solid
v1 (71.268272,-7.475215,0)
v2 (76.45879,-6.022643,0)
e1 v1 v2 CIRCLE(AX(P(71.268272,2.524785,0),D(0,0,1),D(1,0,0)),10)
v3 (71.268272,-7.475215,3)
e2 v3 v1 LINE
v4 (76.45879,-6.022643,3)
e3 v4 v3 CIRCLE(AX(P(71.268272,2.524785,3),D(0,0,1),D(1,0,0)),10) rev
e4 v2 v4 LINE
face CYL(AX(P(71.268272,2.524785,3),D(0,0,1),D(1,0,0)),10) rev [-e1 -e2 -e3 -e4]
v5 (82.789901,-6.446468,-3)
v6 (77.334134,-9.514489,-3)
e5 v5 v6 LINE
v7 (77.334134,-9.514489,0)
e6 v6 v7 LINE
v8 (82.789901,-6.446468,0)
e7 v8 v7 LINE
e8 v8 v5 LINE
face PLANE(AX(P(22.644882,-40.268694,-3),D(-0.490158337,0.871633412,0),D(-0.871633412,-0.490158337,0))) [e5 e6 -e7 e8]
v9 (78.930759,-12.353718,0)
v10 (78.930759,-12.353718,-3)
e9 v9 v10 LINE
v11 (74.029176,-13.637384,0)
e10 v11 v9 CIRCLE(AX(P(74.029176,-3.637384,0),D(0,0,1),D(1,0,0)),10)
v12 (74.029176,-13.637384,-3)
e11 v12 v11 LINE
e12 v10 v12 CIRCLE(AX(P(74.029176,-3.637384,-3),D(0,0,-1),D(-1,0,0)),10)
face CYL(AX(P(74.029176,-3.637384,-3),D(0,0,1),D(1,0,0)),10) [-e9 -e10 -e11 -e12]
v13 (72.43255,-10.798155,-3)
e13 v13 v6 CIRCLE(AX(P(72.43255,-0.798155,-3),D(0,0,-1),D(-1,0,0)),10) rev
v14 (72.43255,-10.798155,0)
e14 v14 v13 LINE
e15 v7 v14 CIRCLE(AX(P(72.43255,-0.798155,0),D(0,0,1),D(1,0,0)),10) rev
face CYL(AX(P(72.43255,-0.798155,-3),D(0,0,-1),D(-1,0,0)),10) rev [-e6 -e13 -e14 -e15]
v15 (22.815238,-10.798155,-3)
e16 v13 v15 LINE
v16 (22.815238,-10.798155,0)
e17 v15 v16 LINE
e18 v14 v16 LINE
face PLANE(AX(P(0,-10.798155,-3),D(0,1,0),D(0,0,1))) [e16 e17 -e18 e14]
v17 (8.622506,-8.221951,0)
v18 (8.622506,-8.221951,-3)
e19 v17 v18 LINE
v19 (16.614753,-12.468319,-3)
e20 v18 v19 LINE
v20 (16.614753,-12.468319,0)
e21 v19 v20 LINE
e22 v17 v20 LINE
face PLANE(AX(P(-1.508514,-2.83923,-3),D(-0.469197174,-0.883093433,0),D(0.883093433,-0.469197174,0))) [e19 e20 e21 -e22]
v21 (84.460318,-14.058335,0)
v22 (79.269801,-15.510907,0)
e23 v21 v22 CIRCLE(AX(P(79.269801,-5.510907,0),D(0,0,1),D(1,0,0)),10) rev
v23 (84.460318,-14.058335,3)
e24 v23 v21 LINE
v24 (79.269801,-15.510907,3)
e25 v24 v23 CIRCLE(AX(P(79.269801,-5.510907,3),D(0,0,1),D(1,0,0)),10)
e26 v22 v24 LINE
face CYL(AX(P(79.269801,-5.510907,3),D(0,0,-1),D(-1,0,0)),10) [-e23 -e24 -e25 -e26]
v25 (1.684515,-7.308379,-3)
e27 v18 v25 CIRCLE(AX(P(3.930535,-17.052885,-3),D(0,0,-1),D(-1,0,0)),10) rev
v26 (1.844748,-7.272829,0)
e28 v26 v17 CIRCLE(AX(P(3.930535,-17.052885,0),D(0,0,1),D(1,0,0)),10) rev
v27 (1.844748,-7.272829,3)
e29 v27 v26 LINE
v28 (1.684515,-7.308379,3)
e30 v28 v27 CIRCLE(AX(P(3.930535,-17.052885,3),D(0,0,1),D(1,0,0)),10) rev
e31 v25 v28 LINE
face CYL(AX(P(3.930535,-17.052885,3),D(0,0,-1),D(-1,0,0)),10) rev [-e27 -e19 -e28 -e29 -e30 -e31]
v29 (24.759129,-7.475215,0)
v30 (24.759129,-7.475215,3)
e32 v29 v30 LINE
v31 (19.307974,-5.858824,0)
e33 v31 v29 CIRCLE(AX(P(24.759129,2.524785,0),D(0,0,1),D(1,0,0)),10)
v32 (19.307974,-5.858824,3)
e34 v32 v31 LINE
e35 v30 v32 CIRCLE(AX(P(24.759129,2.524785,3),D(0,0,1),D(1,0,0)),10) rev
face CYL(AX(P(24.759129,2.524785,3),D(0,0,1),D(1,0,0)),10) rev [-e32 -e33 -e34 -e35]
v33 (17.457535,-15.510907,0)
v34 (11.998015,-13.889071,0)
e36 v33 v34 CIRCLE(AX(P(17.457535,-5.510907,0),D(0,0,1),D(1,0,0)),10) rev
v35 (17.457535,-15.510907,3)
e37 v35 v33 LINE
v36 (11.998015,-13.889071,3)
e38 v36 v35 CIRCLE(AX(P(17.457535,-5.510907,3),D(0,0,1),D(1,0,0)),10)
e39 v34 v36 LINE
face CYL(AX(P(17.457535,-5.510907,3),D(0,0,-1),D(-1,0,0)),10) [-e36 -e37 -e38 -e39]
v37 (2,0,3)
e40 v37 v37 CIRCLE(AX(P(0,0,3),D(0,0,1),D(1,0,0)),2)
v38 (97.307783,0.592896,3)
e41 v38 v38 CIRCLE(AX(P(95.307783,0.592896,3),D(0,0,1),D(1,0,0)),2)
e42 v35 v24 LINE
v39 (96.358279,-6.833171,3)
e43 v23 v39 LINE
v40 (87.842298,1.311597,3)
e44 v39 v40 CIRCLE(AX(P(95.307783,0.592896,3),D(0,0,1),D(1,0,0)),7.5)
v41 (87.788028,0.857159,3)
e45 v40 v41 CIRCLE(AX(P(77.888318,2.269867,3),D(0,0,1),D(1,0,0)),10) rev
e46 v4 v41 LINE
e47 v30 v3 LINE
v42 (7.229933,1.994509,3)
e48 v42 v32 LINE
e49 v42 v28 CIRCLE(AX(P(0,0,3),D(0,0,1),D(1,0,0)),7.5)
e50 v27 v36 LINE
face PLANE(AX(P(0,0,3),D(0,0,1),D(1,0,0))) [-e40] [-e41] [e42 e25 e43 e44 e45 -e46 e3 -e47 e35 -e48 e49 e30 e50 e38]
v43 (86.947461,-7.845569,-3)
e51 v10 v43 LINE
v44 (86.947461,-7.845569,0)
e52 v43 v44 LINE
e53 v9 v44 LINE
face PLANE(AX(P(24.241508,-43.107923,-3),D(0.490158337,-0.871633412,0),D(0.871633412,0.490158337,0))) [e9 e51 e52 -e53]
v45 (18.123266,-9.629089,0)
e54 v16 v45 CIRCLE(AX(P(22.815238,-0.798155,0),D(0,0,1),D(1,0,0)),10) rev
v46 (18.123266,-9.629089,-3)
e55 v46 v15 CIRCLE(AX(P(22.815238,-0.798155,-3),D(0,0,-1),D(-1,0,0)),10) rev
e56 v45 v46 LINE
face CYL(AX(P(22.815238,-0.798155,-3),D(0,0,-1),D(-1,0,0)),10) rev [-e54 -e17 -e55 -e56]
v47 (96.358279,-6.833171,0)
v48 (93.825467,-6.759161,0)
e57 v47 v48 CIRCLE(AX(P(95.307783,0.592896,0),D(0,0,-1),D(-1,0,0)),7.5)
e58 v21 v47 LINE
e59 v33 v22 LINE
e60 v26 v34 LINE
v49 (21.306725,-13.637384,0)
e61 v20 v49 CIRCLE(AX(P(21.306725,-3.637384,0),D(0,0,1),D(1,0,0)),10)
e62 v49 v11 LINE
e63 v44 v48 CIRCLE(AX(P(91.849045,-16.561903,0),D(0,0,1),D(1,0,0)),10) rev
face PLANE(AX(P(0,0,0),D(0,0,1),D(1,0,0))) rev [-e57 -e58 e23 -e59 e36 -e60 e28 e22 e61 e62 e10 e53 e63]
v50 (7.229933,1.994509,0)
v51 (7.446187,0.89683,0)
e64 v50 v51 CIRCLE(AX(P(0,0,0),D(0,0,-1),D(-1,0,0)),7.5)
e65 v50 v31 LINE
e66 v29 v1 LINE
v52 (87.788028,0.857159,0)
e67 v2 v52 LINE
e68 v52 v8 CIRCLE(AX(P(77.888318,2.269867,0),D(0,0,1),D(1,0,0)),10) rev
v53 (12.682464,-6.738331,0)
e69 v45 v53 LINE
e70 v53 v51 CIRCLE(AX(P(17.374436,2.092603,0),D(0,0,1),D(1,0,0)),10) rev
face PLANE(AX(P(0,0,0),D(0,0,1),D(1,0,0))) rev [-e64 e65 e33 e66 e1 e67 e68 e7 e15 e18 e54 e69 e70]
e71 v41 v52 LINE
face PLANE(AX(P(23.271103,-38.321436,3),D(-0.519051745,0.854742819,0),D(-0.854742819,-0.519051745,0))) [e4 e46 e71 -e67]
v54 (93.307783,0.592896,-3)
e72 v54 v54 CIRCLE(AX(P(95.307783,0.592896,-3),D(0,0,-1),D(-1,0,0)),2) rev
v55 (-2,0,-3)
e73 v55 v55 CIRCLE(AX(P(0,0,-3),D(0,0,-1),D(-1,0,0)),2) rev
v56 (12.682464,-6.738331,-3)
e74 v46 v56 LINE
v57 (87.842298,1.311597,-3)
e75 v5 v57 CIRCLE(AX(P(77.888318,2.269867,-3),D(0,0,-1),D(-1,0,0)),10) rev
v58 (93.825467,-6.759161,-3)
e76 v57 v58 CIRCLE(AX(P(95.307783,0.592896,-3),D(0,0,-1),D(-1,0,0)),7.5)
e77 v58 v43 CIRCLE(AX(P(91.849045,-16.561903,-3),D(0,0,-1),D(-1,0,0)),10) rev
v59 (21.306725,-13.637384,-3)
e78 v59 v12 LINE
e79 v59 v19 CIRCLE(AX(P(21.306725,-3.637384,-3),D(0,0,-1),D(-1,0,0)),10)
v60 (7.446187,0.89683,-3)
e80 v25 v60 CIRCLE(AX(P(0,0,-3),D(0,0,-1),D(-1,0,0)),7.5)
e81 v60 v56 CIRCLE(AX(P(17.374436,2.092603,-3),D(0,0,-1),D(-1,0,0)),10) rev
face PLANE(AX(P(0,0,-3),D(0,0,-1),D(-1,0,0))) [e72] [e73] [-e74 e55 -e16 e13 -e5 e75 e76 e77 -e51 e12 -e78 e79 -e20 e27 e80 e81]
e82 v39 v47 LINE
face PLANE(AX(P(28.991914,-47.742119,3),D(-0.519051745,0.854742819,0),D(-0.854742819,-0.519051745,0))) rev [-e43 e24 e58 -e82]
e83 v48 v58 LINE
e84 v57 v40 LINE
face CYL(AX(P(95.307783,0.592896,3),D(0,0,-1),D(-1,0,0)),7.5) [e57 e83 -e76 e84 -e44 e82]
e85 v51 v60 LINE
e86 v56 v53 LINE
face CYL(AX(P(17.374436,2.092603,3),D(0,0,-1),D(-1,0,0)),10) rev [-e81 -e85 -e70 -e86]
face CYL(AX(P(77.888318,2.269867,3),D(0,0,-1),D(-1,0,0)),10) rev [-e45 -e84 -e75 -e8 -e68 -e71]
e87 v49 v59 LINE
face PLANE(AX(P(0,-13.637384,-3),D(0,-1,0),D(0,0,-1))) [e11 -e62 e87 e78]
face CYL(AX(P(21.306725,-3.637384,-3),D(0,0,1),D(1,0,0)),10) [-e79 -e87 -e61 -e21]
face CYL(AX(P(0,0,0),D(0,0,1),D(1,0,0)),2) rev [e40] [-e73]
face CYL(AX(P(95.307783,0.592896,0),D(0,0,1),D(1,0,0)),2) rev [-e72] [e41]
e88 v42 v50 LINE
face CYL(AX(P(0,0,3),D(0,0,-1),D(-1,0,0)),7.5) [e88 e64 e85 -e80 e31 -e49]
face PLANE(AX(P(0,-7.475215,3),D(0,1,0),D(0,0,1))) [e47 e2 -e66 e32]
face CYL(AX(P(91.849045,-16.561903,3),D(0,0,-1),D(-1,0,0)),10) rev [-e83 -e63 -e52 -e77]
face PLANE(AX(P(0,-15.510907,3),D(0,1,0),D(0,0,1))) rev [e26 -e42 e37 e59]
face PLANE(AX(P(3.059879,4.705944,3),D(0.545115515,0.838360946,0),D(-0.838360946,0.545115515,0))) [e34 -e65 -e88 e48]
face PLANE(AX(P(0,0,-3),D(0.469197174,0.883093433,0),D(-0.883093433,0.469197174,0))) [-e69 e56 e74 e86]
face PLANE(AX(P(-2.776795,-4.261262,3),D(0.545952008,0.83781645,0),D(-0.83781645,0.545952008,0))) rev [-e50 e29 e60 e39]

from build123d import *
from build123d.topology import SkipClean

# Parameters (mm, degrees)
EXTRUDE_1_DEPTH     = 3
SKETCH_2_R          = 2
SKETCH_2_R_2        = 1.9999999999999967
CUT_EXTRUDE_1_DEPTH = 105.01455903133225
EXTRUDE_START       = 3
SKETCH_3_R          = 1.9999999999999962
SKETCH_3_R_2        = 2
EXTRUDE_9_DEPTH     = 3
FILLET_1_R          = 10
FILLET_2_R          = 10


with BuildPart() as part:
    # 草图1 → 凸台-拉伸1 (new body)
    with BuildSketch(Plane.XY):
        with BuildLine():
            Line((21.79390335077292, -7.475214596472519), (7.229933319640558, 1.9945085092702048))
            ThreePointArc((7.229933319640558, 1.9945085092702048), (-6.483154274799016, 3.7707705643747733), (1.8411668544431816, -7.270495486148093))
            Line((1.8411668544431845, -7.270495486148092), (14.486878939127898, -15.510906506800303))
            Line((14.486878939127898, -15.510906506800302), (82.06831155956868, -15.510906506800302))
            Line((82.06831155956867, -15.510906506800302), (96.3582789784704, -6.83317051644414))
            ThreePointArc((96.35827897847041, -6.833170516444138), (100.33032000817497, 6.162825901013469), (87.812990018917, 0.8723171575890092))
            Line((87.81299001891699, 0.8723171575890003), (74.06678283695699, -7.475214596472519))
            Line((74.06678283695699, -7.475214596472519), (21.79390335077292, -7.475214596472519))
        make_face()
    extrude(amount=EXTRUDE_1_DEPTH)

    # 草图2 → 切除-拉伸1 (cut, through all)
    with BuildSketch(Plane.XY.offset(3)):
        Circle(SKETCH_2_R)
        with Locations((95.30778311888552, 0.5928956325337316)):
            Circle(SKETCH_2_R_2)
    extrude(amount=-CUT_EXTRUDE_1_DEPTH, mode=Mode.SUBTRACT)

    # 草图3 → 凸台-拉伸9 (add)
    # profile 1 of 3: a face of its own
    with SkipClean():  # the faces are left unmerged after this step: merging them gives an invalid solid
        with BuildSketch(Plane(origin=(0, 0, 0), x_dir=(-1, 0, 0), z_dir=(0, 0, -1)).offset(EXTRUDE_START)):
            with BuildLine():
                ThreePointArc((-91.01590945402396, -5.557699496790565), (-89.75367146553334, -4.447128548171897), (-88.77053253167215, -3.0832918980444344))
                ThreePointArc((-88.77053253167215, -3.0832918980444344), (-88.05246164412989, -1.3071860230668506), (-87.80778311888552, 0.5928956325337297))
                ThreePointArc((-87.80778311888552, 0.5928956325337316), (-87.80908495687888, 0.7326306500420054), (-87.812990018917, 0.8723171575890011))
                ThreePointArc((-87.81299001891699, 0.8723171575890014), (-100.33032000817497, 6.162825901013491), (-96.35827897847041, -6.833170516444131))
                ThreePointArc((-96.35827897847042, -6.833170516444138), (-93.56613473312304, -6.702079412000068), (-91.01590945402396, -5.557699496790565))
            make_face()
            with Locations(Location((-95.30778311888552, 0.5928956325337316, 0), (0, 0, 180))):
                Circle(SKETCH_3_R, mode=Mode.SUBTRACT)
        # profile 2 of 3: a face of its own
        with BuildSketch(Plane(origin=(0, 0, 0), x_dir=(-1, 0, 0), z_dir=(0, 0, -1)).offset(EXTRUDE_START)):
            with BuildLine():
                Line((-75.05143042110615, -10.798154811245045), (-88.77053253167215, -3.0832918980444335))
                ThreePointArc((-88.77053253167215, -3.0832918980444344), (-89.75367146553334, -4.447128548171897), (-91.01590945402396, -5.557699496790565))
                Line((-91.01590945402396, -5.557699496790569), (-76.64805579661679, -13.637384335527532))
                Line((-76.64805579661679, -13.637384335527532), (-18.81509472588799, -13.637384335527532))
                Line((-18.81509472588799, -13.637384335527532), (-4.475261433860523, -6.018474482674216))
                ThreePointArc((-4.475261433860524, -6.018474482674214), (-5.688218997555007, -4.8881657741789315), (-6.623200748856248, -3.5189788064650287))
                Line((-6.623200748856245, -3.5189788064650287), (-20.323608343622624, -10.798154811245045))
                Line((-20.323608343622624, -10.798154811245045), (-75.05143042110615, -10.798154811245045))
            make_face()
        # profile 3 of 3: a face of its own
        with BuildSketch(Plane(origin=(0, 0, 0), x_dir=(-1, 0, 0), z_dir=(0, 0, -1)).offset(EXTRUDE_START)):
            with BuildLine():
                ThreePointArc((-7.229933319640558, 1.9945085092702044), (-7.454996074789714, -0.8203862047048063), (-6.623200748856248, -3.5189788064650287))
                ThreePointArc((-6.623200748856248, -3.5189788064650287), (-5.688218997555007, -4.8881657741789315), (-4.475261433860524, -6.018474482674214))
                ThreePointArc((-4.475261433860524, -6.018474482674214), (-3.2196592565993294, -6.773757765922417), (-1.8411668544431843, -7.270495486148093))
                ThreePointArc((-1.8411668544431843, -7.270495486148093), (4.606584884254069, -5.918561962517747), (7.5, -1.84e-15))
                ThreePointArc((7.5, 0), (1.00635483371816, 7.432176662906506), (-7.229933319640558, 1.9945085092702044))
            make_face()
            with Locations(Location((0, 0, 0), (0, 0, 180))):
                Circle(SKETCH_3_R_2, mode=Mode.SUBTRACT)
        extrude(amount=-EXTRUDE_9_DEPTH)

    # 圆角1
    # the kernel refuses this fillet: 10 mm, written as the material it adds along each edge
    with BuildSketch(Plane(origin=(88.77053253167215, -3.083291898044434, -3), x_dir=(-0.20664882712832097, 0.9784151788716738, 0), z_dir=(0, 0, 1))) as fillet_1_piece_1_section:
        with BuildLine():
            CenterArc((7.4864083793494025, 9.541100058820126), FILLET_1_R, 197.4249522895106, 55.15009542096897)
            Line((-2.0546916794712278, 6.546536707082027), (0, 0))
            ThreePointArc((0, 0), (2.245922513804829, 0.34417495588492364), (4.491845027609668, -5e-17))
        make_face()
    fillet_1_piece_1 = extrude(amount=20.153516540869376, mode=Mode.PRIVATE)
    fillet_1_piece_1 = split(fillet_1_piece_1, bisect_by=Plane(origin=(86.96414266235654, -3.033123271198268, 3), z_dir=(0, 0, -1)), keep=Keep.TOP, mode=Mode.PRIVATE)
    add(fillet_1_piece_1)
    with BuildSketch(Plane(origin=(91.01590945402396, -5.557699496790567, -3), x_dir=(0.9194568899378542, -0.39319082841008474, 0), z_dir=(0, 0, 1))) as fillet_1_piece_2:
        with BuildLine():
            CenterArc((5.092784059285759, -9.790309907458374), FILLET_1_R, 101.75407382431756, 40.75010367707175)
            Line((-2.8411931775201964, -3.7032740766253633), (0, 0))
            ThreePointArc((0, 0), (1.5278352177857282, -0.1572675694062238), (3.055670435571466, 9e-17))
        make_face()
    extrude(amount=3)
    with BuildSketch(Plane(origin=(4.475261433860524, -6.018474482674215, -3), x_dir=(-0.9077280584793651, -0.4195590206982592, 0), z_dir=(0, 0, 1))) as fillet_1_piece_3_section:
        with BuildLine():
            CenterArc((5.124050374991801, 9.787699282299565), FILLET_1_R, 217.21105425538934, 40.96167029208499)
            Line((-2.840082184875719, 3.740171475926284), (0, 0))
            ThreePointArc((0, 0), (1.53721511249754, 0.15922553827532712), (3.0744302249950772, 4e-17))
        make_face()
    fillet_1_piece_3 = extrude(amount=14.740674354083392, mode=Mode.PRIVATE)
    fillet_1_piece_3 = split(fillet_1_piece_3, bisect_by=Plane(origin=(4.991537565692553, -6.857429506035165, 3), z_dir=(0, 0, -1)), keep=Keep.TOP, mode=Mode.PRIVATE)
    add(fillet_1_piece_3)
    with BuildSketch(Plane(origin=(6.623200748856247, -3.5189788064650287, -3), x_dir=(0.883093433180833, -0.46919717419533746, 0), z_dir=(0, 0, 1))) as fillet_1_piece_4:
        with BuildLine():
            CenterArc((6.861406616347785, 10.000000000000002), FILLET_1_R, 214.84990457904146, 55.15009542095851)
            ThreePointArc((-1.3451114501356154, 4.285714285715009), (-0.3441749558850217, 2.245922513805171), (0, 0))
            Line((0, 0), (6.861406616347784, -2e-17))
        make_face()
    extrude(amount=3)

    # 圆角2
    fillet_2_edges = [part.edges().sort_by_distance(p)[0] for p in [
        (21.79390335077292, -7.475214596472519, 1.5),
        (74.06678283695699, -7.475214596472519, 1.5),
        (82.06831155956868, -15.510906506800302, 1.5),
        (14.486878939127898, -15.510906506800303, 1.5),
        (76.64805579661679, -13.637384335527532, -1.5),
        (18.81509472588799, -13.637384335527532, -1.5),
        (20.323608343622624, -10.798154811245045, -1.5),
        (75.05143042110615, -10.798154811245045, -1.5),
    ]]
    fillet(fillet_2_edges, radius=FILLET_2_R)


solid = part.part
